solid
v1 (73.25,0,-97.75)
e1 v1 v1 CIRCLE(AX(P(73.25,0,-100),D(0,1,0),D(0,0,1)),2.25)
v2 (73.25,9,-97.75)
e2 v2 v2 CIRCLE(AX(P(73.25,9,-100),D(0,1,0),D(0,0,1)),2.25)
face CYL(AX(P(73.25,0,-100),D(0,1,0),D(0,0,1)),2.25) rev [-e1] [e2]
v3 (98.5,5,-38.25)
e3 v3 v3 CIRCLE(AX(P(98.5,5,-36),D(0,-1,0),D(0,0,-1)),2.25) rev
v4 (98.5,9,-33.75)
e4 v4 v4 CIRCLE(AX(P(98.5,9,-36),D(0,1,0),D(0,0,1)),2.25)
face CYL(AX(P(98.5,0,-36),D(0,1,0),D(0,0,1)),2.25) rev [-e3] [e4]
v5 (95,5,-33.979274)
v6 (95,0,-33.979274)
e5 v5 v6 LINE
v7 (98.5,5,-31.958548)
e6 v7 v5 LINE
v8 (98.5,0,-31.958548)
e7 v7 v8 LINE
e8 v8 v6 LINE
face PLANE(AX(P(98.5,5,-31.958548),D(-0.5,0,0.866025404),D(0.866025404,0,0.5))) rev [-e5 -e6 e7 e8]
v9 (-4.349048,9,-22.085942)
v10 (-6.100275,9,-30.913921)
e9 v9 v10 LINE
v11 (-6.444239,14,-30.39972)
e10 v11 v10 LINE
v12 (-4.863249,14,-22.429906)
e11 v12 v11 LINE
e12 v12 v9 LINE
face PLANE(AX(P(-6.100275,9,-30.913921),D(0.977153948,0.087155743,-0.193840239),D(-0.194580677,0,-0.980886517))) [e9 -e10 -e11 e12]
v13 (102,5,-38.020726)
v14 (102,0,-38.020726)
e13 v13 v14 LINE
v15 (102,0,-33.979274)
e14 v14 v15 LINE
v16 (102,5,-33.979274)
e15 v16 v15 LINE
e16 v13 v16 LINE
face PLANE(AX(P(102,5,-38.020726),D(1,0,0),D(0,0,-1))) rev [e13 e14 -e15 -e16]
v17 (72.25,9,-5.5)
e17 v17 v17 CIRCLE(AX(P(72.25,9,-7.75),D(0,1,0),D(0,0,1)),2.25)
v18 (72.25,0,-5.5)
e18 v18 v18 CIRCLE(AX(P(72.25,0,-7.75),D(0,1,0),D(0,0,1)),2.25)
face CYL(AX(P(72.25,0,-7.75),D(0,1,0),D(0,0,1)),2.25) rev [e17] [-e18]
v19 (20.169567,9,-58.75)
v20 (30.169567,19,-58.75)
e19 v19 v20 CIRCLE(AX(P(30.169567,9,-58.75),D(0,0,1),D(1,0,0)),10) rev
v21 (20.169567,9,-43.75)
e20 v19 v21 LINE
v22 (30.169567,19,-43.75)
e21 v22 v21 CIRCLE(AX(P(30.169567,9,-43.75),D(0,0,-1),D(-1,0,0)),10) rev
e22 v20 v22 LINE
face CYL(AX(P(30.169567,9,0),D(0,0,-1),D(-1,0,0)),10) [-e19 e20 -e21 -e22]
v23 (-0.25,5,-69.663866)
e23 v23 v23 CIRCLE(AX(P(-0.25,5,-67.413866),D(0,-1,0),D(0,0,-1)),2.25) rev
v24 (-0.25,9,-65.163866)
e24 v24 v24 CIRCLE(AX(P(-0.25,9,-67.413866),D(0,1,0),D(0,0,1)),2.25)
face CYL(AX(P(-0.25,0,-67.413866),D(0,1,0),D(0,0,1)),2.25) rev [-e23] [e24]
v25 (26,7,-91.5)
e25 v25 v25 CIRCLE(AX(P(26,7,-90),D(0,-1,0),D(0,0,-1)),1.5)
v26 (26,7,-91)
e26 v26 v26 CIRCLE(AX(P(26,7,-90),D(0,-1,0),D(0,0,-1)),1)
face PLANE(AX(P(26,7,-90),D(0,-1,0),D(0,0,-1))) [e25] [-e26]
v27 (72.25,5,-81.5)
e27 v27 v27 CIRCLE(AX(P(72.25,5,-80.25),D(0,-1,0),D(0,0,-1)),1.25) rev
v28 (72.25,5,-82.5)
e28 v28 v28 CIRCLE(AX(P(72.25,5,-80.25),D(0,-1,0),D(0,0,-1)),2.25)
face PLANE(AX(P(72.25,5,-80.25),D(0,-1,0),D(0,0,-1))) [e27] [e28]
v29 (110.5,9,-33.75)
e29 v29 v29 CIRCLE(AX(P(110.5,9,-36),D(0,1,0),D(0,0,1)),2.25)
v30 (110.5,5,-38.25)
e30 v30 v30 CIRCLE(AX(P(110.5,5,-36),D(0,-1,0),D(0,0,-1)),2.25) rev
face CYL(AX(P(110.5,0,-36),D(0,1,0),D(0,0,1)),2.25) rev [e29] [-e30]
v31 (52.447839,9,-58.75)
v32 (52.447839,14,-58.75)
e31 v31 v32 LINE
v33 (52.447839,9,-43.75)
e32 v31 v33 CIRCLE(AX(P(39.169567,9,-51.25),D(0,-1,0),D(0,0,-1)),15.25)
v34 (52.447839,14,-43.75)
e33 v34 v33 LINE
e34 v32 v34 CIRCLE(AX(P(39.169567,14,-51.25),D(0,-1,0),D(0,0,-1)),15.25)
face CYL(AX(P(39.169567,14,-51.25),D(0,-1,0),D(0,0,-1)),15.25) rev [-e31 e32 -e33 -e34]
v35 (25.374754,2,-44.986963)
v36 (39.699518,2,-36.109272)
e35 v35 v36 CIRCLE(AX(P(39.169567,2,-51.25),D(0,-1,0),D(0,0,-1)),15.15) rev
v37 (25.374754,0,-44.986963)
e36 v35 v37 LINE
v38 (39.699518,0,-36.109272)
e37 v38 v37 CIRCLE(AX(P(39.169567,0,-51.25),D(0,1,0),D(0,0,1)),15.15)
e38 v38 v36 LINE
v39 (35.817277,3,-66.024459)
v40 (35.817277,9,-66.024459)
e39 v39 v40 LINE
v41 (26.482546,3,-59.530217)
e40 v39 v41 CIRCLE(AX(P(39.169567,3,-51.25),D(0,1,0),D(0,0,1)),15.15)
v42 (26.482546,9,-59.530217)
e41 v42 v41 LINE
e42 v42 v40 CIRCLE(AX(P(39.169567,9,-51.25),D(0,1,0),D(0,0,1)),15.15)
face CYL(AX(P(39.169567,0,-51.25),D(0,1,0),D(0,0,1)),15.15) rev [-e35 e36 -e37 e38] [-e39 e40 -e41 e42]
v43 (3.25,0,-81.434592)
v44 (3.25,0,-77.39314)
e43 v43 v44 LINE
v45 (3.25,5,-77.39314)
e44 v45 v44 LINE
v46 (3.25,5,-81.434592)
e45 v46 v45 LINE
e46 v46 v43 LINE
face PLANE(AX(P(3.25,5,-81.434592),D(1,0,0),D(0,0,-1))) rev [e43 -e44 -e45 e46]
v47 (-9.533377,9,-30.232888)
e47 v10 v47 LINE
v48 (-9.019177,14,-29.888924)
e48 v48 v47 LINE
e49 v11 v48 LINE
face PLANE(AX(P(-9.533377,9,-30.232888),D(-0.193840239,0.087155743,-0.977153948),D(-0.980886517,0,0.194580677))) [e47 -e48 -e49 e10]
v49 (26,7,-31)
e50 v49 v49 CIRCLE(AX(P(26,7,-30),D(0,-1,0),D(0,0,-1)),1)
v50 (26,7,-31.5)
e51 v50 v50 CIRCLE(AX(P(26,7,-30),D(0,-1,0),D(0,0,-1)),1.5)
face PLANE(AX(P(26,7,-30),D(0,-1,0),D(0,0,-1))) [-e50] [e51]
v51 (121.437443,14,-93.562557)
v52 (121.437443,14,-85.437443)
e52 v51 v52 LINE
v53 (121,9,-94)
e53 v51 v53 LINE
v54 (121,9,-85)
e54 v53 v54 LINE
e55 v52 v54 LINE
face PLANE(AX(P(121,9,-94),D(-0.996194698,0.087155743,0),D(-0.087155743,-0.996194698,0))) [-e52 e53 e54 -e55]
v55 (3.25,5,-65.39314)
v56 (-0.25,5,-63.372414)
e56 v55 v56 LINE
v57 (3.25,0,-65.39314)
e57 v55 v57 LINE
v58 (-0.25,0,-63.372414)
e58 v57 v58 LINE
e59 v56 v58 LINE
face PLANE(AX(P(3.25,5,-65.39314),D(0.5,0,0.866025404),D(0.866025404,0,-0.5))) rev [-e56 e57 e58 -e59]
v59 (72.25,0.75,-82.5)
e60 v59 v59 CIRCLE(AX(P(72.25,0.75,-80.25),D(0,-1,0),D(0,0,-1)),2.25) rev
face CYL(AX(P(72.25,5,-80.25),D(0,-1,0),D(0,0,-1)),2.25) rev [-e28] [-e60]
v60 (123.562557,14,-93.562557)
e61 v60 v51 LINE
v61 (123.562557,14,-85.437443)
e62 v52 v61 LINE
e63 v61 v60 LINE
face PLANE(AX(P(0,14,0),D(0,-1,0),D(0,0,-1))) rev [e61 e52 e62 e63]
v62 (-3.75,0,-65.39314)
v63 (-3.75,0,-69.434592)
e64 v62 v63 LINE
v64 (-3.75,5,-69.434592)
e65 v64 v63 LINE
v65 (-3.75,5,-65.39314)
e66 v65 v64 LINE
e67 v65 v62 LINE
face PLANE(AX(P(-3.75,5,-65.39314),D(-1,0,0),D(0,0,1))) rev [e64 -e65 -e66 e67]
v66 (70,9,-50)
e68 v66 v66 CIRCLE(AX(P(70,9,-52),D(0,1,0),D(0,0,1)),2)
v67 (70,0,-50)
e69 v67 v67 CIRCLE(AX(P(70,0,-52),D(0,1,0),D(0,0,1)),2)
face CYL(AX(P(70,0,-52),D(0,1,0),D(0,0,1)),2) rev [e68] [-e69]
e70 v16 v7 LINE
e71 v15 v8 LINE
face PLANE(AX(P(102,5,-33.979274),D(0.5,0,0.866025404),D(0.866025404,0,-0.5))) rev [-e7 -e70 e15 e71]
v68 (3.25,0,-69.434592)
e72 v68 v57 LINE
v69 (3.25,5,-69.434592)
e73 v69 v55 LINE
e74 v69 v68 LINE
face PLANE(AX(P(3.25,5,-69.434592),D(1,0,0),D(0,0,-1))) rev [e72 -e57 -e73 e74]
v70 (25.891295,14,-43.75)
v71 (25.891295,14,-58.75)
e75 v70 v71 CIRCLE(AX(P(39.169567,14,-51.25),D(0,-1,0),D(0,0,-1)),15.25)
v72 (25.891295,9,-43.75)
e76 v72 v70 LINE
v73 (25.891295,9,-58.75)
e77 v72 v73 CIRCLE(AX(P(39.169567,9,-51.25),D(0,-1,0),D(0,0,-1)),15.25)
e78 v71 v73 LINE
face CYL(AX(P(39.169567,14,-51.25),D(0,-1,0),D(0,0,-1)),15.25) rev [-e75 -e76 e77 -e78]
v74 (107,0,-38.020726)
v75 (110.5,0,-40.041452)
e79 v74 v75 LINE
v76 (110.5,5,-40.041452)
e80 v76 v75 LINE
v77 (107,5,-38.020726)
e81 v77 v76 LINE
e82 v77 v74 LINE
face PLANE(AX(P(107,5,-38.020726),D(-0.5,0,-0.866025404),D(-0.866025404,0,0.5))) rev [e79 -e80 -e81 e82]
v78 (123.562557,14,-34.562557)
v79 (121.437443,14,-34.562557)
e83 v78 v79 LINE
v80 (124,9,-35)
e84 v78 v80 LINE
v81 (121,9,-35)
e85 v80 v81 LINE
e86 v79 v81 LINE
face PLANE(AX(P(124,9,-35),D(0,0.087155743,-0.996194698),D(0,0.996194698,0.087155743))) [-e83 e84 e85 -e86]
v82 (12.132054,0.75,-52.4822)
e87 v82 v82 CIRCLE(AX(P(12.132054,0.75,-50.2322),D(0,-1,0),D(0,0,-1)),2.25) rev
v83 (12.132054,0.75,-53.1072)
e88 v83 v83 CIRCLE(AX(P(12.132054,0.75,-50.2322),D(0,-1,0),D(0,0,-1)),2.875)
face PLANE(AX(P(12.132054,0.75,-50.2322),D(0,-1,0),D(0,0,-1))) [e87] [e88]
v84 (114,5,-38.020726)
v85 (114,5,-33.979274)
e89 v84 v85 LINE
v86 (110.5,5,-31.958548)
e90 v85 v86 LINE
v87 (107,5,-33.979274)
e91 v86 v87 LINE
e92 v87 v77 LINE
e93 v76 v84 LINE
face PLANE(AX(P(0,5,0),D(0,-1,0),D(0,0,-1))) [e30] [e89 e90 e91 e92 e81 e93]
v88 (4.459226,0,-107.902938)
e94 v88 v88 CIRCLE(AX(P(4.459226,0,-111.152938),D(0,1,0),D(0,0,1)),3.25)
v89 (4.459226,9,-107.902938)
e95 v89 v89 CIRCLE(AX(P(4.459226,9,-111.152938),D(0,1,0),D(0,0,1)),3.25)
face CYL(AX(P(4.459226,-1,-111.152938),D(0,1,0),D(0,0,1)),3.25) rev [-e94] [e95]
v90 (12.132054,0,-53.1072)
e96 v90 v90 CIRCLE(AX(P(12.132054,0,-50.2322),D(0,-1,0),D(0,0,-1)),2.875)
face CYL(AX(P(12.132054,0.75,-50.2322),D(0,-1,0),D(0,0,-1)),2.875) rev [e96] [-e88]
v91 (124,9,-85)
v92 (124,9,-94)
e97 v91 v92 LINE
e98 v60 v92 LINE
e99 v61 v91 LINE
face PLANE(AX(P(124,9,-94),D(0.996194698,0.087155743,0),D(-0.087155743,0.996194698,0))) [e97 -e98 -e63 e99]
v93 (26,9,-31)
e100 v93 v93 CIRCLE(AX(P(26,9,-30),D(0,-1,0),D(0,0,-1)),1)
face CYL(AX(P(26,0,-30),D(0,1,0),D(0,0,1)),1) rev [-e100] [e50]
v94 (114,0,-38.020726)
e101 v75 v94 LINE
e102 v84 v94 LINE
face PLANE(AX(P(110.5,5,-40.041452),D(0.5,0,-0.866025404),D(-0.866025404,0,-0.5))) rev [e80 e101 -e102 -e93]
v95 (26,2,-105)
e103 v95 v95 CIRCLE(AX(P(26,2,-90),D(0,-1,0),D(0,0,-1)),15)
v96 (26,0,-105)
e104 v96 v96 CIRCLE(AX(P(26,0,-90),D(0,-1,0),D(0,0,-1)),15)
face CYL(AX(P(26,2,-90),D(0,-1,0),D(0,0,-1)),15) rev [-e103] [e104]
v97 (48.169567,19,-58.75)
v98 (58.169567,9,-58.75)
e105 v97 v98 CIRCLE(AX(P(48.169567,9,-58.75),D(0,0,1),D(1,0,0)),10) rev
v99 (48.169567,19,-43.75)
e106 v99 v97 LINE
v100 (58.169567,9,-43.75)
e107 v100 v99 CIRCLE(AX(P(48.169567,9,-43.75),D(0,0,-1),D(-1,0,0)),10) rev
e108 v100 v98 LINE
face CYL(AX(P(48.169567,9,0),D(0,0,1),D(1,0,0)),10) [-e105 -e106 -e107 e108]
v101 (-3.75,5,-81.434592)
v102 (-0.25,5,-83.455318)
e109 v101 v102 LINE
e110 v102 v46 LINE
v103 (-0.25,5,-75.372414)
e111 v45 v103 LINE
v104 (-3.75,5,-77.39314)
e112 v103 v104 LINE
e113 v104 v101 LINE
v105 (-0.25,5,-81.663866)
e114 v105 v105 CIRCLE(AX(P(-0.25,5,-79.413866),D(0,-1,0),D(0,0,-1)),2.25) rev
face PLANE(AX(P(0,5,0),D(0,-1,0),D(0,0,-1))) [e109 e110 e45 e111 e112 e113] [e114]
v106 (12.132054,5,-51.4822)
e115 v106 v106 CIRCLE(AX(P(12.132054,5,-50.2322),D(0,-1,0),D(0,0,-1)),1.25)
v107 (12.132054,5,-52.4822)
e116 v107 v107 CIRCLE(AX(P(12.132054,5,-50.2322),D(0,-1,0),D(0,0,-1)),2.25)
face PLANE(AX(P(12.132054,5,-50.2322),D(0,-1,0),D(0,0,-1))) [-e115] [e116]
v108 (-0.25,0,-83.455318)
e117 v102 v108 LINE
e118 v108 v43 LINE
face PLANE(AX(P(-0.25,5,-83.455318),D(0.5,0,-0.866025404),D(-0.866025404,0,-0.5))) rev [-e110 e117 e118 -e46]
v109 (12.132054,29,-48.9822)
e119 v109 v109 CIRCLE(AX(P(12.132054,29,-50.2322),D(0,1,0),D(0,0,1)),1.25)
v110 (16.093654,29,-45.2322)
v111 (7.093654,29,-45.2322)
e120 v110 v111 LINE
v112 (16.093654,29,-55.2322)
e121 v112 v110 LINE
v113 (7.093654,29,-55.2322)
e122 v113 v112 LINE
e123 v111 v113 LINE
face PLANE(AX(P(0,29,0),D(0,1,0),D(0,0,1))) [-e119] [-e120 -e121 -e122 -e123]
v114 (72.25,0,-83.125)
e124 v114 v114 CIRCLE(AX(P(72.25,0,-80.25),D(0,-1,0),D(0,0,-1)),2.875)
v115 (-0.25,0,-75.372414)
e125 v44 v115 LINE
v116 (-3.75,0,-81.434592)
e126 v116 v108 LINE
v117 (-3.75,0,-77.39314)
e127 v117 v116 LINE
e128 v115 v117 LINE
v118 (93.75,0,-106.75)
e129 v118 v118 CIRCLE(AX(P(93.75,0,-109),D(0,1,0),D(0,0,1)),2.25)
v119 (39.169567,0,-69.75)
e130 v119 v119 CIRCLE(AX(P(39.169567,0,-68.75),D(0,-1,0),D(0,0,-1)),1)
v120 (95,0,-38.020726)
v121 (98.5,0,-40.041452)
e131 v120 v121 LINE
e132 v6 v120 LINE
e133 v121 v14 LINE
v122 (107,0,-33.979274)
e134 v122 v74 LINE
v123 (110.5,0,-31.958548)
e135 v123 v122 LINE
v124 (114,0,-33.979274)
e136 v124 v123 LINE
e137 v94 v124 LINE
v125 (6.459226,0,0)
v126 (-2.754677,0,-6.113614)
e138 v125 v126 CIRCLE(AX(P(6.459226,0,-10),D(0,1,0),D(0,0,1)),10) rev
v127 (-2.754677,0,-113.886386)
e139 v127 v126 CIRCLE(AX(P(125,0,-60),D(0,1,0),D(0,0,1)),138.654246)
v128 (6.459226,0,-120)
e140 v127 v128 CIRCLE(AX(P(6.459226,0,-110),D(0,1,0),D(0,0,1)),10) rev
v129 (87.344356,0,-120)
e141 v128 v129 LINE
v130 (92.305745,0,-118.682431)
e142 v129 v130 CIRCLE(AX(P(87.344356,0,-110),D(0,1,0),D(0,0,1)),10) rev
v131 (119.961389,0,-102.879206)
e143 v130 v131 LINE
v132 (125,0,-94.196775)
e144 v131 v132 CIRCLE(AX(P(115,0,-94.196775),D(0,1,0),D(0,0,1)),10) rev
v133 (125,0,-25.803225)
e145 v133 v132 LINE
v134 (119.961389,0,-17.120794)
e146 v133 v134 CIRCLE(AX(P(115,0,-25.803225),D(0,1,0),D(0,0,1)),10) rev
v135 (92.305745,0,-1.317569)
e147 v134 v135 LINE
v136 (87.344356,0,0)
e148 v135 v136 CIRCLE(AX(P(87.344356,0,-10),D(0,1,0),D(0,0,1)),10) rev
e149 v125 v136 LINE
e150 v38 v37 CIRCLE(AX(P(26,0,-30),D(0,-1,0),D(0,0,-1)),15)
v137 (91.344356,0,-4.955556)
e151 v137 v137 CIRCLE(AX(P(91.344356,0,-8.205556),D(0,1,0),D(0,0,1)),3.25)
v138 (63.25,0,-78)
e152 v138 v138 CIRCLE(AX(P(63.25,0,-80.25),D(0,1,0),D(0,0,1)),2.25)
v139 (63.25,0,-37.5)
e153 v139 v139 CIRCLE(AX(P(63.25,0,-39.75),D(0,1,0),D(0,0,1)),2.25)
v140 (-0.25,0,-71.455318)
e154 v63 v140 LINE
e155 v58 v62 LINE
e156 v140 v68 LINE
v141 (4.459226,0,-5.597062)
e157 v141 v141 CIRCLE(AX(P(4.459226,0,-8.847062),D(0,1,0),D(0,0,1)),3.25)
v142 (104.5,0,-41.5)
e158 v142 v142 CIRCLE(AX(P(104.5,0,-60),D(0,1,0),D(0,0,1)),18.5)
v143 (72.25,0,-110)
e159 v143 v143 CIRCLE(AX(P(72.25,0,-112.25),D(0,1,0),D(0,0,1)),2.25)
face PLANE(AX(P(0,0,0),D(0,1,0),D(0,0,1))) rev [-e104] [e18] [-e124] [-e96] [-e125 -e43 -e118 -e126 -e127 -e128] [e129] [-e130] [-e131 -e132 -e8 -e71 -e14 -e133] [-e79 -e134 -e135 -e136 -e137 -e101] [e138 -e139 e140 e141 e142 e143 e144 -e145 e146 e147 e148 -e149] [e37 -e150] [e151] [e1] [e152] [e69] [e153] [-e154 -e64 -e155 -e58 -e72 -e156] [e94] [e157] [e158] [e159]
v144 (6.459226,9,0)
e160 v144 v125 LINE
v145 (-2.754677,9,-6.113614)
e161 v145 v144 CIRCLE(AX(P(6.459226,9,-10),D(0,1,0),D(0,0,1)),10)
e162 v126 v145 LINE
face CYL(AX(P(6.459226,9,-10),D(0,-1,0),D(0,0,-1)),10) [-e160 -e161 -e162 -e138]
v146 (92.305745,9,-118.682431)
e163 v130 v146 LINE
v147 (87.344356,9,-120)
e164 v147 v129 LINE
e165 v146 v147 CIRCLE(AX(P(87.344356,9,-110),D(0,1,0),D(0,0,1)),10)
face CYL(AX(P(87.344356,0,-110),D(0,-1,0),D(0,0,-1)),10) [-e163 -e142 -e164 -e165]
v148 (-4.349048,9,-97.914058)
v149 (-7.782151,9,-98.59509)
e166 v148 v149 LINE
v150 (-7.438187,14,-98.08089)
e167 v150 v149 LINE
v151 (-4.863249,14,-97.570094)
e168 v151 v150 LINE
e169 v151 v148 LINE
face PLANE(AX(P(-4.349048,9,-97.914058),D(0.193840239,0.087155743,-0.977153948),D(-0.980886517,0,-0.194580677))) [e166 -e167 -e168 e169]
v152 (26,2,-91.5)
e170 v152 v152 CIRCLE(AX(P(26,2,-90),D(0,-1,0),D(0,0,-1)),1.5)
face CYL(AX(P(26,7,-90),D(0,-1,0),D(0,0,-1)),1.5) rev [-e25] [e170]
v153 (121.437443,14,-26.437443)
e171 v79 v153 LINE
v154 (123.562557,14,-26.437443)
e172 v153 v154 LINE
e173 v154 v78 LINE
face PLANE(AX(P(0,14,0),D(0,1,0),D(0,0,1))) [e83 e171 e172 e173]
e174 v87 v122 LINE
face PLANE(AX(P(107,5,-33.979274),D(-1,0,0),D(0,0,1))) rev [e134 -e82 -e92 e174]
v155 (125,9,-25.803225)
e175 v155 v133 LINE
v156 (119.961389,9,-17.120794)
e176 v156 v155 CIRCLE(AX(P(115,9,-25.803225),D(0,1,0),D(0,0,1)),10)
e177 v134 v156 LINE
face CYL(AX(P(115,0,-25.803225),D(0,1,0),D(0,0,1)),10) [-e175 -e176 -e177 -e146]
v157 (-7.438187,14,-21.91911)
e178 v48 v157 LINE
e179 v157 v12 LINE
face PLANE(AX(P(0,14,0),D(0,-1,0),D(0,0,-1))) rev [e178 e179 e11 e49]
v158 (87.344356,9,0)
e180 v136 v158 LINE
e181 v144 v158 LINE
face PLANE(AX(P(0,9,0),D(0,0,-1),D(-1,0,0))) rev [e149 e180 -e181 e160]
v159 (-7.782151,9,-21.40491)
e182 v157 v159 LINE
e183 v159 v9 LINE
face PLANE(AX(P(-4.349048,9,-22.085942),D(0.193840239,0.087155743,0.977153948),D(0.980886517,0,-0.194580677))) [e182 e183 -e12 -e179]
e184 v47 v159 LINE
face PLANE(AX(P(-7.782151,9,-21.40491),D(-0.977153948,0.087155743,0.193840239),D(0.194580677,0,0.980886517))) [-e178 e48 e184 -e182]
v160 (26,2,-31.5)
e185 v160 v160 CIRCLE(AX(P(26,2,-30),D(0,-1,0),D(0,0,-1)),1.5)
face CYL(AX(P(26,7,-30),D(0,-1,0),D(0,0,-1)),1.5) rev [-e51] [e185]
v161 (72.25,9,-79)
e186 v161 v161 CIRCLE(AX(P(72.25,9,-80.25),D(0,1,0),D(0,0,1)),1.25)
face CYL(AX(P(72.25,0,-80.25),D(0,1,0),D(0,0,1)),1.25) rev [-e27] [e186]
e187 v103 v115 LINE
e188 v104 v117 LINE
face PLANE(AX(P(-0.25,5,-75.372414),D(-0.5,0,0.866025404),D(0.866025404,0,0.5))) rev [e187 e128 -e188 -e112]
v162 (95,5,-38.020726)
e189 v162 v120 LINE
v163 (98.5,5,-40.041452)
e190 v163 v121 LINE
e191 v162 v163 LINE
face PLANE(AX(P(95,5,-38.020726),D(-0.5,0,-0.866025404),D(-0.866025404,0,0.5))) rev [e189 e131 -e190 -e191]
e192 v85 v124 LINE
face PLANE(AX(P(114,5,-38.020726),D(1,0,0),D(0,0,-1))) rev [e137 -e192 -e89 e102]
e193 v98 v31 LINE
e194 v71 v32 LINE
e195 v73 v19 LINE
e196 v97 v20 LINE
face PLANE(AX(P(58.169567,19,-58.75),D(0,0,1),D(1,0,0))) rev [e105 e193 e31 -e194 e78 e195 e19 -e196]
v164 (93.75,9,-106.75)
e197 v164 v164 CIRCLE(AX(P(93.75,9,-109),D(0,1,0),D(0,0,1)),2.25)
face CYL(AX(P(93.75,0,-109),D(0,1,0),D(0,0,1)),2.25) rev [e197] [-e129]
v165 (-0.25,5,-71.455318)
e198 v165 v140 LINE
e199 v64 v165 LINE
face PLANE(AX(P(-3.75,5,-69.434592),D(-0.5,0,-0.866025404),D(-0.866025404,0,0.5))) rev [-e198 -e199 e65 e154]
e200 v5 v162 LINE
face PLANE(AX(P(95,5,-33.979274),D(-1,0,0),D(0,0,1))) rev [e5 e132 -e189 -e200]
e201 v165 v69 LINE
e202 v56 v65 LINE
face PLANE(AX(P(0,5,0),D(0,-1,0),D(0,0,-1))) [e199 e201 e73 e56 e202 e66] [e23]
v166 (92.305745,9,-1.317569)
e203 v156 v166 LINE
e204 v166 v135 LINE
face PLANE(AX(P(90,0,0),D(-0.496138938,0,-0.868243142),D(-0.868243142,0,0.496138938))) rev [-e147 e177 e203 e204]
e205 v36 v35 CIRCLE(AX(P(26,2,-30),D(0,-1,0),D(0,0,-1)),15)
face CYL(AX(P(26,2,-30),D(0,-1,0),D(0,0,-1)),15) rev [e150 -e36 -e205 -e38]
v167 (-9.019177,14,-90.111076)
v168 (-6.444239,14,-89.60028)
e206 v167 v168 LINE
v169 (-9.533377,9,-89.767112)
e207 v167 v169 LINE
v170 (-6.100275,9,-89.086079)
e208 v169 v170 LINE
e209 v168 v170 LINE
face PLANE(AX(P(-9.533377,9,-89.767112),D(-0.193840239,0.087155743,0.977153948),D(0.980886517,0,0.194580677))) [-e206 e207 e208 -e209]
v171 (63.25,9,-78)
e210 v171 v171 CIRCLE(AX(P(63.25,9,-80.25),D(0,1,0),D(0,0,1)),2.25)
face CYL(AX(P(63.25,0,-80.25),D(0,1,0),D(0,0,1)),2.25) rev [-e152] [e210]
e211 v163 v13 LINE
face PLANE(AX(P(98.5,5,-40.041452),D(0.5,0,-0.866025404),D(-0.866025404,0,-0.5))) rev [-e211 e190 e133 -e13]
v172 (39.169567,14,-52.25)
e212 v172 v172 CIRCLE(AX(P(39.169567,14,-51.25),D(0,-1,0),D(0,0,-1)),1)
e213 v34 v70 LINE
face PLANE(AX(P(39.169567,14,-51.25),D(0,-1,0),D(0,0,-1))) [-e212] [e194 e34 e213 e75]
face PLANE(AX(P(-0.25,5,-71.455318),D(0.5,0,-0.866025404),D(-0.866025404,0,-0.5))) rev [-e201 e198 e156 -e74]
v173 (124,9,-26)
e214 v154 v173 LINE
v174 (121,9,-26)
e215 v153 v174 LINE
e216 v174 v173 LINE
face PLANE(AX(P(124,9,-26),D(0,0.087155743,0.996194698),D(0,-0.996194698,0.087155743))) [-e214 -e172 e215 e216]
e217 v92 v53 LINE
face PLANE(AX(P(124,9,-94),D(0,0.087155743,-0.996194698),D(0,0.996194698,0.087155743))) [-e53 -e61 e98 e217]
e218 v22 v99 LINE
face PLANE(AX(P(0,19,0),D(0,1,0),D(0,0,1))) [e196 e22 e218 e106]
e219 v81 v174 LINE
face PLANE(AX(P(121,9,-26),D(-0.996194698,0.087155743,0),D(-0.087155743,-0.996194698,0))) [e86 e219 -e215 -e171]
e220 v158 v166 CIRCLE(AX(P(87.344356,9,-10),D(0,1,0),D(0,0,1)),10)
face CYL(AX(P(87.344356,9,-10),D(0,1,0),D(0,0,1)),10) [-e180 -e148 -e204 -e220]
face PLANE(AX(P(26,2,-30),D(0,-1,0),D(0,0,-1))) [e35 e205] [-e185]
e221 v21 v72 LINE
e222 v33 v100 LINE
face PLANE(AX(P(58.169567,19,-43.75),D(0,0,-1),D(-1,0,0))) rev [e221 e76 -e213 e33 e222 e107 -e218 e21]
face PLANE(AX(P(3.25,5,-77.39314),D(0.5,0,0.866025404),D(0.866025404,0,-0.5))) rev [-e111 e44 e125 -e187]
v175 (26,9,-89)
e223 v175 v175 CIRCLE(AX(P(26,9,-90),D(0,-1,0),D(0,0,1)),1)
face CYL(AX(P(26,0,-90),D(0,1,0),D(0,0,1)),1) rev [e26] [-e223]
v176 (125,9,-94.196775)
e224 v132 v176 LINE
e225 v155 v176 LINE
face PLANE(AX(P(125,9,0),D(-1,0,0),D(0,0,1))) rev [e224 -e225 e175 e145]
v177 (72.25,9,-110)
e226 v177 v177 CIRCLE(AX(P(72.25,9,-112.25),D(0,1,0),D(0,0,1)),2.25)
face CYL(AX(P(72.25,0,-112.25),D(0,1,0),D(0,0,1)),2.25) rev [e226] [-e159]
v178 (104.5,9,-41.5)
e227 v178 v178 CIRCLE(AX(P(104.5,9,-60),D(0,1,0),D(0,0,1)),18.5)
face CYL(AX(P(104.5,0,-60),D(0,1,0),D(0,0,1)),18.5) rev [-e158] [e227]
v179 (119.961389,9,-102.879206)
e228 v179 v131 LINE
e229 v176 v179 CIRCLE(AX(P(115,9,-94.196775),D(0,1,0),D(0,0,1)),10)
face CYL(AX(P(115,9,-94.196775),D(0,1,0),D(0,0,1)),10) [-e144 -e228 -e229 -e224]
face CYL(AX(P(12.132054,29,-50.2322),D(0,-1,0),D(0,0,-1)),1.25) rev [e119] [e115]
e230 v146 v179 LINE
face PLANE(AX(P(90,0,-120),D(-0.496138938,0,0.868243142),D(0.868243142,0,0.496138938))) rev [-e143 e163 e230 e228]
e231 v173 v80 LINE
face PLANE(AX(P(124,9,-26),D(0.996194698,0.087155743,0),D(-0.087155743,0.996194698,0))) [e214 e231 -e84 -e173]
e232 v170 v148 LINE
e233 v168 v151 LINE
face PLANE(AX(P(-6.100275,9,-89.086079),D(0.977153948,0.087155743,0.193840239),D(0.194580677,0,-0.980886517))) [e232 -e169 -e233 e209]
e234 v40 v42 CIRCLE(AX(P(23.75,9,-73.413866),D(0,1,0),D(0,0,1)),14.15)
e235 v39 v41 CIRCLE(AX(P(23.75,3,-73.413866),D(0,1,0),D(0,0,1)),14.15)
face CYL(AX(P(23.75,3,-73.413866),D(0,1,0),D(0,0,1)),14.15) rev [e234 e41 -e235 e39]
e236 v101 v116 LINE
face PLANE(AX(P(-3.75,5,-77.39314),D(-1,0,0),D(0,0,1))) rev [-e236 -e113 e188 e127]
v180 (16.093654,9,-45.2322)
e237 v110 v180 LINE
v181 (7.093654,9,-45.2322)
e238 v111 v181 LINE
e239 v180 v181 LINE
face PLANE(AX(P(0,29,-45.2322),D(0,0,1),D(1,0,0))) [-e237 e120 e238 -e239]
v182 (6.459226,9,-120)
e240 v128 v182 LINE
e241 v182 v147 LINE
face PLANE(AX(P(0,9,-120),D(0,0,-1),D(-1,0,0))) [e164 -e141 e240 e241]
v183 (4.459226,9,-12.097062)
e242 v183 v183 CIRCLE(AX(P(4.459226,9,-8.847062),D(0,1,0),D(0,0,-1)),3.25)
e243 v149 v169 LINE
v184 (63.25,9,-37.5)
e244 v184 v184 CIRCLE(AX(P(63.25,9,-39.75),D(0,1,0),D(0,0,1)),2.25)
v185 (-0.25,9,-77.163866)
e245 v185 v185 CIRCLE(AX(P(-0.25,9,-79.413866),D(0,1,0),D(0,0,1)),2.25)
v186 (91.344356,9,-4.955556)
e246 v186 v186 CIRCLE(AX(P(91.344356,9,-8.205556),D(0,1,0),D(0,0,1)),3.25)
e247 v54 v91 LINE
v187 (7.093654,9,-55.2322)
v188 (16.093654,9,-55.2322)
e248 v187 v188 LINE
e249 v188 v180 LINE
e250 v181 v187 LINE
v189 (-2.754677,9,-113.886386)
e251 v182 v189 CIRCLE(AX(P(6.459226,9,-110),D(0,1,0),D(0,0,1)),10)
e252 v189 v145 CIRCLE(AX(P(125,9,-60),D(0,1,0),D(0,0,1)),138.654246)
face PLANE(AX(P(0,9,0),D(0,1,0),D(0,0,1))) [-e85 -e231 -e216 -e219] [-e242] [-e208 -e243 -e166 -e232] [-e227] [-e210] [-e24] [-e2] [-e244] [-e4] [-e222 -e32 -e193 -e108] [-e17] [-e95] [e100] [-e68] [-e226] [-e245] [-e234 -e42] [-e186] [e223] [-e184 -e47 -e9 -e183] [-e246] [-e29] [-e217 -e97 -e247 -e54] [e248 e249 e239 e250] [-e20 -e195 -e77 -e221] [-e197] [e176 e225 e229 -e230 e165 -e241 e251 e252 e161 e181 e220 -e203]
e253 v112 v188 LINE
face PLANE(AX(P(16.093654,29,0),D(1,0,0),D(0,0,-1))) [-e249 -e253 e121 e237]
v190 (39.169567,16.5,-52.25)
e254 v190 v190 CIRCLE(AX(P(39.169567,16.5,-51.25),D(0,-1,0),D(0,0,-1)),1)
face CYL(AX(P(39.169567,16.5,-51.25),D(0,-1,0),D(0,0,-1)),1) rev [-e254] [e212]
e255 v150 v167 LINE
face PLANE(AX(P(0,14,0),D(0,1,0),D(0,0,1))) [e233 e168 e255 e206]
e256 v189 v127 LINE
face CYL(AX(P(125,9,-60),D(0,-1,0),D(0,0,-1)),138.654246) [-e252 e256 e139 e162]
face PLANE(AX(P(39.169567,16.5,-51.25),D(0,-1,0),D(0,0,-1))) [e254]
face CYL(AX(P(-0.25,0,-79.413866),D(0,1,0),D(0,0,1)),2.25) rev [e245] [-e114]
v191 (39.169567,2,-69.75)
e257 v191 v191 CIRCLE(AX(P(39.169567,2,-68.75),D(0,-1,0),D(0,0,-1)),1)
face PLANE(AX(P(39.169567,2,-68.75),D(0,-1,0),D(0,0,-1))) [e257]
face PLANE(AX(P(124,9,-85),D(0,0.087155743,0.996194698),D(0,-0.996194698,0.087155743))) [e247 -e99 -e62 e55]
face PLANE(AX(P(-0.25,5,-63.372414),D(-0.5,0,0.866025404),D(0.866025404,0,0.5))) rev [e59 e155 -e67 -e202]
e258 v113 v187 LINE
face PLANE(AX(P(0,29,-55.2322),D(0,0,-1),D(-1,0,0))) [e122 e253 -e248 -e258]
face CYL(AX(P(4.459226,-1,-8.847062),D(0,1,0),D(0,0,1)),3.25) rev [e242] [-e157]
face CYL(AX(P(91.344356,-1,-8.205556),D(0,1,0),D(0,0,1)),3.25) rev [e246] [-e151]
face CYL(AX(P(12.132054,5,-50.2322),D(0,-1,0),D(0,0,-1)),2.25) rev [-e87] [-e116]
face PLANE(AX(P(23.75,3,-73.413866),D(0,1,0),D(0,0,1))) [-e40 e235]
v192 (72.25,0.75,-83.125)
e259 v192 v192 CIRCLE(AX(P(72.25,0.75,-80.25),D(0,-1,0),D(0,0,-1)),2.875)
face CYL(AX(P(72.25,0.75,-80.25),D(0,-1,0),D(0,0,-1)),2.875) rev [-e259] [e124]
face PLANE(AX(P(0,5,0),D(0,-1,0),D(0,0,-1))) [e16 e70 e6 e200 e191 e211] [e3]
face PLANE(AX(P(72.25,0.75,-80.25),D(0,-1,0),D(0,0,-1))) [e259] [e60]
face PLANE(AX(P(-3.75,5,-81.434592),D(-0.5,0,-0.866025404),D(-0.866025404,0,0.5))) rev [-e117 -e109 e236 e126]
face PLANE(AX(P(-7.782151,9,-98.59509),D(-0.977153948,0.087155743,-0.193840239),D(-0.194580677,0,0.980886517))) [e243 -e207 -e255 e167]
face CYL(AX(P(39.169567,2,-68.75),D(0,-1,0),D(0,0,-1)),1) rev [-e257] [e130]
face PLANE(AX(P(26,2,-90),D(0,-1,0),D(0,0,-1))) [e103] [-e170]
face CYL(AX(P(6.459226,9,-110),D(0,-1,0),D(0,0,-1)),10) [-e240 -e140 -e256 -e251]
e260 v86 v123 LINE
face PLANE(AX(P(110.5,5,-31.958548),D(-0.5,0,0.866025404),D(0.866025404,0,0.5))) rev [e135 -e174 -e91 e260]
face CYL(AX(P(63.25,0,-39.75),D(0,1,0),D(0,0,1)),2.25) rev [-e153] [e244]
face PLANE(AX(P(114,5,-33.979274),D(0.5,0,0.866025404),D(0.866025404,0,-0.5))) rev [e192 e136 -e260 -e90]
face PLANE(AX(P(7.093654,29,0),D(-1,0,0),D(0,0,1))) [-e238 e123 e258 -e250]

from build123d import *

# Parameters (mm, degrees)
SKETCH1_W                         = 125
SKETCH1_H                         = 120
TOP_BASE_DEPTH                    = 9
SKETCH5_R                         = 14.15
DRIVE_GEAR_HOLE_DEPTH             = 6
SKETCH28_R                        = 15.15
TWO_STAGE_GEAR_HOLE_DEPTH         = 174.51080658
SKETCH8_R                         = 18.5
XL320_FINGER_KNUCKLE_MOUNT_DEPTH  = 174.51080658
SKETCH26_R                        = 1
STRING_HOLES_DEPTH                = 174.51080658
XL320_MOUNT_HOLES_R               = 2.25
XL320_MOUNT_HOLES_M4_DEPTH        = 174.51080658
AX12_MOUNT_HOLES_R                = 2.25
AX12_MOUNT_HOLES_M4_DEPTH         = 174.51080658
NUTS_M4_DEPTH                     = 5
SKETCH34_R                        = 15
HOLES_FOR_M4_IN_FINGER_GEAR_DEPTH = 2
SKETCH31_W                        = 38
SKETCH31_H                        = 15
BOSS_EXTRUDE1_DEPTH               = 10
SKETCH32_R                        = 15.25
CUT_EXTRUDE5_DEPTH                = 5
SKETCH33_R                        = 1
CUT_EXTRUDE6_DEPTH                = 2.5
FILLET2_R                         = 10
CUT_EXTRUDE8_DEPTH                = 174.565549577
FILLET4_R                         = 10
SKETCH37_R                        = 3.25
CONNECT_HOLES_M6_DEPTH            = 10
SKETCH41_R                        = 2
CONNECT_TO_HOUSE_M4_DEPTH         = 174.565549577
SKETCH42_W                        = 3
SKETCH42_H                        = 9
HOUSING_FITS_DEPTH                = 5
HOUSING_FITS_DRAFT                = 5
HOUSING_FITS_PROFILE_2_DEPTH      = 5
HOUSING_FITS_PROFILE_2_DRAFT      = 5
HOUSING_FITS_PROFILE_3_DEPTH      = 5
HOUSING_FITS_PROFILE_3_DRAFT      = 5
HOUSING_FITS_PROFILE_4_DEPTH      = 5
HOUSING_FITS_PROFILE_4_DRAFT      = 5
SKETCH43_R                        = 1
M2_SHAFT_HOLE_DEPTH               = 2
SKETCH54_R                        = 1.5
HOLLOW_SHAFT_HOLE_DEPTH           = 5
SKETCH46_R                        = 1.25
CUT_EXTRUDE11_DEPTH               = 174.565549577
SKETCH47_R                        = 2.25
CUT_EXTRUDE12_DEPTH               = 5
SKETCH48_R                        = 2.875
CUT_EXTRUDE13_DEPTH               = 0.75
SKETCH49_R                        = 1.25
BOSS_EXTRUDE2_DEPTH               = 20
SKETCH51_R                        = 1.25
CUT_EXTRUDE14_DEPTH               = 175.427635425
SKETCH52_R                        = 2.25
CUT_EXTRUDE15_DEPTH               = 5
SKETCH53_R                        = 2.875
CUT_EXTRUDE16_DEPTH               = 0.75


with BuildPart() as part:
    # Sketch1 → Top_Base (new body)
    with BuildSketch(Plane(origin=(0, 0, 0), x_dir=(1, 0, 0), z_dir=(0, 1, 0))):
        with BuildLine():
            ThreePointArc((0, 120), (-13.654246239, 60), (0, 0))
            Line((0, 0), (0, 120))
        make_face()
        with Locations((62.5, 60)):
            Rectangle(SKETCH1_W, SKETCH1_H)
    extrude(amount=TOP_BASE_DEPTH)

    # Sketch5 → Drive_Gear_Hole (cut)
    with BuildSketch(Plane(origin=(0, 9, 0), x_dir=(1, 0, 0), z_dir=(0, 1, 0))):
        with Locations(Location((23.75, 73.41386581, 0), (0, 0, 270))):
            Circle(SKETCH5_R)
    extrude(amount=-DRIVE_GEAR_HOLE_DEPTH, mode=Mode.SUBTRACT)

    # Sketch28 → Two_Stage_Gear_Hole (cut, through all)
    with BuildSketch(Plane(origin=(0, 9, 0), x_dir=(1, 0, 0), z_dir=(0, 1, 0))):
        with Locations(Location((39.169567191, 51.25, 0), (0, 0, 270))):
            Circle(SKETCH28_R)
    extrude(amount=-TWO_STAGE_GEAR_HOLE_DEPTH, mode=Mode.SUBTRACT)

    # Sketch8 → XL320_Finger_Knuckle_Mount (cut, through all)
    with BuildSketch(Plane(origin=(0, 9, 0), x_dir=(1, 0, 0), z_dir=(0, 1, 0))):
        with Locations(Location((104.5, 60, 0), (0, 0, 270))):
            Circle(SKETCH8_R)
    extrude(amount=-XL320_FINGER_KNUCKLE_MOUNT_DEPTH, mode=Mode.SUBTRACT)

    # Sketch26 → String_Holes (cut, through all)
    with BuildSketch(Plane.XZ.offset(-9)):
        with Locations(Location((26, -30, 0), (0, 0, 270))):
            Circle(SKETCH26_R)
        with Locations(Location((26, -90, 0), (0, 0, 90))):
            Circle(SKETCH26_R)
    extrude(amount=STRING_HOLES_DEPTH, mode=Mode.SUBTRACT)

    # XL320_Mount_Holes → XL320_Mount_Holes_(M4) (cut, through all)
    with BuildSketch(Plane(origin=(0, 9, 0), x_dir=(1, 0, 0), z_dir=(0, 1, 0))):
        with Locations(Location((110.5, 36, 0), (0, 0, 270))):
            Circle(XL320_MOUNT_HOLES_R)
        with Locations(Location((98.5, 36, 0), (0, 0, 270))):
            Circle(XL320_MOUNT_HOLES_R)
        with Locations(Location((-0.25, 79.41386581, 0), (0, 0, 270))):
            Circle(XL320_MOUNT_HOLES_R)
        with Locations(Location((-0.25, 67.41386581, 0), (0, 0, 270))):
            Circle(XL320_MOUNT_HOLES_R)
    extrude(amount=-XL320_MOUNT_HOLES_M4_DEPTH, mode=Mode.SUBTRACT)

    # AX12_Mount_Holes → AX12_Mount_Holes_(M4) (cut, through all)
    with BuildSketch(Plane(origin=(0, 9, 0), x_dir=(1, 0, 0), z_dir=(0, 1, 0))):
        with Locations(Location((72.25, 112.25, 0), (0, 0, 270))):
            Circle(AX12_MOUNT_HOLES_R)
        with Locations(Location((63.25, 80.25, 0), (0, 0, 270))):
            Circle(AX12_MOUNT_HOLES_R)
        with Locations(Location((73.25, 100, 0), (0, 0, 270))):
            Circle(AX12_MOUNT_HOLES_R)
        with Locations(Location((93.75, 109, 0), (0, 0, 270))):
            Circle(AX12_MOUNT_HOLES_R)
        with Locations(Location((63.25, 39.75, 0), (0, 0, 270))):
            Circle(AX12_MOUNT_HOLES_R)
        with Locations(Location((72.25, 7.75, 0), (0, 0, 270))):
            Circle(AX12_MOUNT_HOLES_R)
    extrude(amount=-AX12_MOUNT_HOLES_M4_DEPTH, mode=Mode.SUBTRACT)

    # Sketch27 → Nuts_(M4) (cut)
    with BuildSketch(Plane.XZ):
        Polygon((110.5, -31.958548116), (107, -33.979274058), (107, -38.020725942), (110.5, -40.041451884), (114, -38.020725942), (114, -33.979274058), align=None)
        Polygon((98.5, -31.958548116), (95, -33.979274058), (95, -38.020725942), (98.5, -40.041451884), (102, -38.020725942), (102, -33.979274058), align=None)
        Polygon((3.25, -65.393139868), (-0.25, -63.372413926), (-3.75, -65.393139868), (-3.75, -69.434591752), (-0.25, -71.455317694), (3.25, -69.434591752), align=None)
        Polygon((-3.75, -77.393139868), (-3.75, -81.434591752), (-0.25, -83.455317694), (3.25, -81.434591752), (3.25, -77.393139868), (-0.25, -75.372413926), align=None)
    extrude(amount=-NUTS_M4_DEPTH, mode=Mode.SUBTRACT)

    # Sketch34 → Holes_For_M4_In_Finger_Gear (cut)
    with BuildSketch(Plane.XZ):
        with Locations((26, -30)):
            Circle(SKETCH34_R)
        with Locations(Location((26, -90, 0), (0, 0, 270))):
            Circle(SKETCH34_R)
    extrude(amount=-HOLES_FOR_M4_IN_FINGER_GEAR_DEPTH, mode=Mode.SUBTRACT)

    # Sketch31 → Boss-Extrude1 (add)
    with BuildSketch(Plane(origin=(0, 9, 0), x_dir=(1, 0, 0), z_dir=(0, 1, 0))):
        with Locations((39.169567191, 51.25)):
            Rectangle(SKETCH31_W, SKETCH31_H)
    extrude(amount=BOSS_EXTRUDE1_DEPTH)

    # Sketch32 → Cut-Extrude5 (cut)
    with BuildSketch(Plane.XZ.offset(-9)):
        with Locations((39.169567191, -51.25)):
            Circle(SKETCH32_R)
    extrude(amount=-CUT_EXTRUDE5_DEPTH, mode=Mode.SUBTRACT)

    # Sketch33 → Cut-Extrude6 (cut)
    with BuildSketch(Plane.XZ.offset(-14)):
        with Locations(Location((39.169567191, -51.25, 0), (0, 0, 270))):
            Circle(SKETCH33_R)
    extrude(amount=-CUT_EXTRUDE6_DEPTH, mode=Mode.SUBTRACT)

    # Fillet2
    fillet2_edges = [part.edges().sort_by_distance(p)[0] for p in [
        (58.169567191, 19, -51.25),
        (20.169567191, 19, -51.25),
    ]]
    fillet(fillet2_edges, radius=FILLET2_R - 0.0001)  # a hair under: the kernel refuses the full size

    # Sketch36 → Cut-Extrude8 (cut, through all)
    with BuildSketch(Plane(origin=(0, 9, 0), x_dir=(1, 0, 0), z_dir=(0, 1, 0))):
        Polygon((90, 120), (125, 100), (125, 120), align=None)
        Polygon((125, 0), (90, 0), (125, 20), align=None)
    extrude(amount=-CUT_EXTRUDE8_DEPTH, mode=Mode.SUBTRACT)

    # Fillet4
    fillet4_edges = [part.edges().sort_by_distance(p)[0] for p in [
        (90, 4.5, -120),
        (125, 4.5, -100),
        (125, 4.5, -20),
        (90, 4.5, 0),
        (0, 4.5, -120),
        (0, 4.5, 0),
    ]]
    fillet(fillet4_edges, radius=FILLET4_R)

    # Sketch37 → Connect_Holes_(M6) (cut)
    with BuildSketch(Plane(origin=(0, 9, 0), x_dir=(1, 0, 0), z_dir=(0, 1, 0))):
        with Locations(Location((4.459226107, 111.152938298, 0), (0, 0, 270))):
            Circle(SKETCH37_R)
        with Locations(Location((4.459226107, 8.847061702, 0), (0, 0, 270))):
            Circle(SKETCH37_R)
        with Locations(Location((91.344355629, 8.205555711, 0), (0, 0, 270))):
            Circle(SKETCH37_R)
    extrude(amount=-CONNECT_HOLES_M6_DEPTH, mode=Mode.SUBTRACT)

    # Sketch41 → Connect_To_House_(M4) (cut, through all)
    with BuildSketch(Plane(origin=(0, 9, 0), x_dir=(1, 0, 0), z_dir=(0, 1, 0))):
        with Locations(Location((70, 52, 0), (0, 0, 270))):
            Circle(SKETCH41_R)
    extrude(amount=-CONNECT_TO_HOUSE_M4_DEPTH, mode=Mode.SUBTRACT)


with BuildPart() as housing_fits_tool:
    # Sketch42 → Housing_Fits (with draft: the straight prism first)
    with BuildSketch(Plane(origin=(0, 9, 0), x_dir=(1, 0, 0), z_dir=(0, 1, 0))):
        with Locations((122.5, 30.5)):
            Rectangle(SKETCH42_W, SKETCH42_H)
    extrude(amount=HOUSING_FITS_DEPTH)
    # Housing_Fits: the draft: its side faces are tilted about the plane it starts from
    housing_fits_sides = [housing_fits_tool.faces().sort_by_distance(p)[0] for p in [
        (124, 11.5, -30.5),
        (122.5, 11.5, -35),
        (121, 11.5, -30.5),
        (122.5, 11.5, -26),
    ]]
    draft(housing_fits_sides, Plane(origin=(0, 9, 0), x_dir=(1, 0, 0), z_dir=(0, 1, 0)), HOUSING_FITS_DRAFT)


with BuildPart() as part_1:
    add(part.part)

    # Housing_Fits: add housing_fits_tool
    add(housing_fits_tool.part)


with BuildPart() as housing_fits_profile_2_tool:
    # Sketch42 → Housing_Fits profile 2 (with draft: the straight prism first)
    with BuildSketch(Plane(origin=(0, 9, 0), x_dir=(1, 0, 0), z_dir=(0, 1, 0))):
        Polygon((-9.533377338, 30.232888291), (-7.782151246, 21.404909633), (-4.349048435, 22.085942002), (-6.100274527, 30.91392066), align=None)
    extrude(amount=HOUSING_FITS_PROFILE_2_DEPTH)
    # Housing_Fits profile 2: the draft: its side faces are tilted about the plane it starts from
    housing_fits_profile_2_sides = [housing_fits_profile_2_tool.faces().sort_by_distance(p)[0] for p in [
        (-8.657764292, 11.5, -25.818898962),
        (-6.065599841, 11.5, -21.745425818),
        (-5.224661481, 11.5, -26.499931331),
        (-7.816825933, 11.5, -30.573404475),
    ]]
    draft(housing_fits_profile_2_sides, Plane(origin=(0, 9, 0), x_dir=(1, 0, 0), z_dir=(0, 1, 0)), HOUSING_FITS_PROFILE_2_DRAFT)


with BuildPart() as part_2:
    add(part_1.part)

    # Housing_Fits profile 2: add housing_fits_profile_2_tool
    add(housing_fits_profile_2_tool.part)


with BuildPart() as housing_fits_profile_3_tool:
    # Sketch42 → Housing_Fits profile 3 (with draft: the straight prism first)
    with BuildSketch(Plane(origin=(0, 9, 0), x_dir=(1, 0, 0), z_dir=(0, 1, 0))):
        Polygon((-4.349048435, 97.914057998), (-7.782151246, 98.595090367), (-9.533377338, 89.767111709), (-6.100274527, 89.08607934), align=None)
    extrude(amount=HOUSING_FITS_PROFILE_3_DEPTH)
    # Housing_Fits profile 3: the draft: its side faces are tilted about the plane it starts from
    housing_fits_profile_3_sides = [housing_fits_profile_3_tool.faces().sort_by_distance(p)[0] for p in [
        (-6.065599841, 11.5, -98.254574182),
        (-8.657764292, 11.5, -94.181101038),
        (-7.816825933, 11.5, -89.426595525),
        (-5.224661481, 11.5, -93.500068669),
    ]]
    draft(housing_fits_profile_3_sides, Plane(origin=(0, 9, 0), x_dir=(1, 0, 0), z_dir=(0, 1, 0)), HOUSING_FITS_PROFILE_3_DRAFT)


with BuildPart() as part_3:
    add(part_2.part)

    # Housing_Fits profile 3: add housing_fits_profile_3_tool
    add(housing_fits_profile_3_tool.part)


with BuildPart() as housing_fits_profile_4_tool:
    # Sketch42 → Housing_Fits profile 4 (with draft: the straight prism first)
    with BuildSketch(Plane(origin=(0, 9, 0), x_dir=(1, 0, 0), z_dir=(0, 1, 0))):
        with Locations((122.5, 89.5)):
            Rectangle(SKETCH42_W, SKETCH42_H)
    extrude(amount=HOUSING_FITS_PROFILE_4_DEPTH)
    # Housing_Fits profile 4: the draft: its side faces are tilted about the plane it starts from
    housing_fits_profile_4_sides = [housing_fits_profile_4_tool.faces().sort_by_distance(p)[0] for p in [
        (122.5, 11.5, -94),
        (121, 11.5, -89.5),
        (122.5, 11.5, -85),
        (124, 11.5, -89.5),
    ]]
    draft(housing_fits_profile_4_sides, Plane(origin=(0, 9, 0), x_dir=(1, 0, 0), z_dir=(0, 1, 0)), HOUSING_FITS_PROFILE_4_DRAFT)


with BuildPart() as part_4:
    add(part_3.part)

    # Housing_Fits profile 4: add housing_fits_profile_4_tool
    add(housing_fits_profile_4_tool.part)

    # Sketch43 → M2_Shaft_Hole (cut)
    with BuildSketch(Plane.XZ):
        with Locations(Location((39.169567191, -68.75, 0), (0, 0, 270))):
            Circle(SKETCH43_R)
    extrude(amount=-M2_SHAFT_HOLE_DEPTH, mode=Mode.SUBTRACT)

    # Sketch54 → Hollow_Shaft_Hole (cut)
    with BuildSketch(Plane.XZ.offset(-2)):
        with Locations(Location((26, -30, 0), (0, 0, 270))):
            Circle(SKETCH54_R)
        with Locations(Location((26, -90, 0), (0, 0, 270))):
            Circle(SKETCH54_R)
    extrude(amount=-HOLLOW_SHAFT_HOLE_DEPTH, mode=Mode.SUBTRACT)

    # Sketch46 → Cut-Extrude11 (cut, through all)
    with BuildSketch(Plane(origin=(0, 9, 0), x_dir=(1, 0, 0), z_dir=(0, 1, 0))):
        with Locations(Location((72.25, 80.25, 0), (0, 0, 270))):
            Circle(SKETCH46_R)
    extrude(amount=-CUT_EXTRUDE11_DEPTH, mode=Mode.SUBTRACT)

    # Sketch47 → Cut-Extrude12 (cut)
    with BuildSketch(Plane.XZ):
        with Locations(Location((72.25, -80.25, 0), (0, 0, 270))):
            Circle(SKETCH47_R)
    extrude(amount=-CUT_EXTRUDE12_DEPTH, mode=Mode.SUBTRACT)

    # Sketch48 → Cut-Extrude13 (cut)
    with BuildSketch(Plane.XZ):
        with Locations(Location((72.25, -80.25, 0), (0, 0, 270))):
            Circle(SKETCH48_R)
    extrude(amount=-CUT_EXTRUDE13_DEPTH, mode=Mode.SUBTRACT)

    # Sketch49 → Boss-Extrude2 (add)
    with BuildSketch(Plane(origin=(0, 9, 0), x_dir=(1, 0, 0), z_dir=(0, 1, 0))):
        Polygon((16.093653761, 45.2322), (12.132053761, 45.2322), (7.093653761, 45.2322), (7.093653761, 55.2322), (12.132053761, 55.2322), (16.093653761, 55.2322), align=None)
        with Locations(Location((12.132053761, 50.2322, 0), (0, 0, 270))):
            Circle(SKETCH49_R, mode=Mode.SUBTRACT)
    extrude(amount=BOSS_EXTRUDE2_DEPTH)

    # Sketch51 → Cut-Extrude14 (cut, through all)
    with BuildSketch(Plane(origin=(0, 9, 0), x_dir=(1, 0, 0), z_dir=(0, 1, 0))):
        with Locations(Location((12.132053761, 50.2322, 0), (0, 0, 270))):
            Circle(SKETCH51_R)
    extrude(amount=-CUT_EXTRUDE14_DEPTH, mode=Mode.SUBTRACT)

    # Sketch52 → Cut-Extrude15 (cut)
    with BuildSketch(Plane.XZ):
        with Locations(Location((12.132053761, -50.2322, 0), (0, 0, 270))):
            Circle(SKETCH52_R)
    extrude(amount=-CUT_EXTRUDE15_DEPTH, mode=Mode.SUBTRACT)

    # Sketch53 → Cut-Extrude16 (cut)
    with BuildSketch(Plane.XZ):
        with Locations(Location((12.132053761, -50.2322, 0), (0, 0, 270))):
            Circle(SKETCH53_R)
    extrude(amount=-CUT_EXTRUDE16_DEPTH, mode=Mode.SUBTRACT)


solid = part_4.part
